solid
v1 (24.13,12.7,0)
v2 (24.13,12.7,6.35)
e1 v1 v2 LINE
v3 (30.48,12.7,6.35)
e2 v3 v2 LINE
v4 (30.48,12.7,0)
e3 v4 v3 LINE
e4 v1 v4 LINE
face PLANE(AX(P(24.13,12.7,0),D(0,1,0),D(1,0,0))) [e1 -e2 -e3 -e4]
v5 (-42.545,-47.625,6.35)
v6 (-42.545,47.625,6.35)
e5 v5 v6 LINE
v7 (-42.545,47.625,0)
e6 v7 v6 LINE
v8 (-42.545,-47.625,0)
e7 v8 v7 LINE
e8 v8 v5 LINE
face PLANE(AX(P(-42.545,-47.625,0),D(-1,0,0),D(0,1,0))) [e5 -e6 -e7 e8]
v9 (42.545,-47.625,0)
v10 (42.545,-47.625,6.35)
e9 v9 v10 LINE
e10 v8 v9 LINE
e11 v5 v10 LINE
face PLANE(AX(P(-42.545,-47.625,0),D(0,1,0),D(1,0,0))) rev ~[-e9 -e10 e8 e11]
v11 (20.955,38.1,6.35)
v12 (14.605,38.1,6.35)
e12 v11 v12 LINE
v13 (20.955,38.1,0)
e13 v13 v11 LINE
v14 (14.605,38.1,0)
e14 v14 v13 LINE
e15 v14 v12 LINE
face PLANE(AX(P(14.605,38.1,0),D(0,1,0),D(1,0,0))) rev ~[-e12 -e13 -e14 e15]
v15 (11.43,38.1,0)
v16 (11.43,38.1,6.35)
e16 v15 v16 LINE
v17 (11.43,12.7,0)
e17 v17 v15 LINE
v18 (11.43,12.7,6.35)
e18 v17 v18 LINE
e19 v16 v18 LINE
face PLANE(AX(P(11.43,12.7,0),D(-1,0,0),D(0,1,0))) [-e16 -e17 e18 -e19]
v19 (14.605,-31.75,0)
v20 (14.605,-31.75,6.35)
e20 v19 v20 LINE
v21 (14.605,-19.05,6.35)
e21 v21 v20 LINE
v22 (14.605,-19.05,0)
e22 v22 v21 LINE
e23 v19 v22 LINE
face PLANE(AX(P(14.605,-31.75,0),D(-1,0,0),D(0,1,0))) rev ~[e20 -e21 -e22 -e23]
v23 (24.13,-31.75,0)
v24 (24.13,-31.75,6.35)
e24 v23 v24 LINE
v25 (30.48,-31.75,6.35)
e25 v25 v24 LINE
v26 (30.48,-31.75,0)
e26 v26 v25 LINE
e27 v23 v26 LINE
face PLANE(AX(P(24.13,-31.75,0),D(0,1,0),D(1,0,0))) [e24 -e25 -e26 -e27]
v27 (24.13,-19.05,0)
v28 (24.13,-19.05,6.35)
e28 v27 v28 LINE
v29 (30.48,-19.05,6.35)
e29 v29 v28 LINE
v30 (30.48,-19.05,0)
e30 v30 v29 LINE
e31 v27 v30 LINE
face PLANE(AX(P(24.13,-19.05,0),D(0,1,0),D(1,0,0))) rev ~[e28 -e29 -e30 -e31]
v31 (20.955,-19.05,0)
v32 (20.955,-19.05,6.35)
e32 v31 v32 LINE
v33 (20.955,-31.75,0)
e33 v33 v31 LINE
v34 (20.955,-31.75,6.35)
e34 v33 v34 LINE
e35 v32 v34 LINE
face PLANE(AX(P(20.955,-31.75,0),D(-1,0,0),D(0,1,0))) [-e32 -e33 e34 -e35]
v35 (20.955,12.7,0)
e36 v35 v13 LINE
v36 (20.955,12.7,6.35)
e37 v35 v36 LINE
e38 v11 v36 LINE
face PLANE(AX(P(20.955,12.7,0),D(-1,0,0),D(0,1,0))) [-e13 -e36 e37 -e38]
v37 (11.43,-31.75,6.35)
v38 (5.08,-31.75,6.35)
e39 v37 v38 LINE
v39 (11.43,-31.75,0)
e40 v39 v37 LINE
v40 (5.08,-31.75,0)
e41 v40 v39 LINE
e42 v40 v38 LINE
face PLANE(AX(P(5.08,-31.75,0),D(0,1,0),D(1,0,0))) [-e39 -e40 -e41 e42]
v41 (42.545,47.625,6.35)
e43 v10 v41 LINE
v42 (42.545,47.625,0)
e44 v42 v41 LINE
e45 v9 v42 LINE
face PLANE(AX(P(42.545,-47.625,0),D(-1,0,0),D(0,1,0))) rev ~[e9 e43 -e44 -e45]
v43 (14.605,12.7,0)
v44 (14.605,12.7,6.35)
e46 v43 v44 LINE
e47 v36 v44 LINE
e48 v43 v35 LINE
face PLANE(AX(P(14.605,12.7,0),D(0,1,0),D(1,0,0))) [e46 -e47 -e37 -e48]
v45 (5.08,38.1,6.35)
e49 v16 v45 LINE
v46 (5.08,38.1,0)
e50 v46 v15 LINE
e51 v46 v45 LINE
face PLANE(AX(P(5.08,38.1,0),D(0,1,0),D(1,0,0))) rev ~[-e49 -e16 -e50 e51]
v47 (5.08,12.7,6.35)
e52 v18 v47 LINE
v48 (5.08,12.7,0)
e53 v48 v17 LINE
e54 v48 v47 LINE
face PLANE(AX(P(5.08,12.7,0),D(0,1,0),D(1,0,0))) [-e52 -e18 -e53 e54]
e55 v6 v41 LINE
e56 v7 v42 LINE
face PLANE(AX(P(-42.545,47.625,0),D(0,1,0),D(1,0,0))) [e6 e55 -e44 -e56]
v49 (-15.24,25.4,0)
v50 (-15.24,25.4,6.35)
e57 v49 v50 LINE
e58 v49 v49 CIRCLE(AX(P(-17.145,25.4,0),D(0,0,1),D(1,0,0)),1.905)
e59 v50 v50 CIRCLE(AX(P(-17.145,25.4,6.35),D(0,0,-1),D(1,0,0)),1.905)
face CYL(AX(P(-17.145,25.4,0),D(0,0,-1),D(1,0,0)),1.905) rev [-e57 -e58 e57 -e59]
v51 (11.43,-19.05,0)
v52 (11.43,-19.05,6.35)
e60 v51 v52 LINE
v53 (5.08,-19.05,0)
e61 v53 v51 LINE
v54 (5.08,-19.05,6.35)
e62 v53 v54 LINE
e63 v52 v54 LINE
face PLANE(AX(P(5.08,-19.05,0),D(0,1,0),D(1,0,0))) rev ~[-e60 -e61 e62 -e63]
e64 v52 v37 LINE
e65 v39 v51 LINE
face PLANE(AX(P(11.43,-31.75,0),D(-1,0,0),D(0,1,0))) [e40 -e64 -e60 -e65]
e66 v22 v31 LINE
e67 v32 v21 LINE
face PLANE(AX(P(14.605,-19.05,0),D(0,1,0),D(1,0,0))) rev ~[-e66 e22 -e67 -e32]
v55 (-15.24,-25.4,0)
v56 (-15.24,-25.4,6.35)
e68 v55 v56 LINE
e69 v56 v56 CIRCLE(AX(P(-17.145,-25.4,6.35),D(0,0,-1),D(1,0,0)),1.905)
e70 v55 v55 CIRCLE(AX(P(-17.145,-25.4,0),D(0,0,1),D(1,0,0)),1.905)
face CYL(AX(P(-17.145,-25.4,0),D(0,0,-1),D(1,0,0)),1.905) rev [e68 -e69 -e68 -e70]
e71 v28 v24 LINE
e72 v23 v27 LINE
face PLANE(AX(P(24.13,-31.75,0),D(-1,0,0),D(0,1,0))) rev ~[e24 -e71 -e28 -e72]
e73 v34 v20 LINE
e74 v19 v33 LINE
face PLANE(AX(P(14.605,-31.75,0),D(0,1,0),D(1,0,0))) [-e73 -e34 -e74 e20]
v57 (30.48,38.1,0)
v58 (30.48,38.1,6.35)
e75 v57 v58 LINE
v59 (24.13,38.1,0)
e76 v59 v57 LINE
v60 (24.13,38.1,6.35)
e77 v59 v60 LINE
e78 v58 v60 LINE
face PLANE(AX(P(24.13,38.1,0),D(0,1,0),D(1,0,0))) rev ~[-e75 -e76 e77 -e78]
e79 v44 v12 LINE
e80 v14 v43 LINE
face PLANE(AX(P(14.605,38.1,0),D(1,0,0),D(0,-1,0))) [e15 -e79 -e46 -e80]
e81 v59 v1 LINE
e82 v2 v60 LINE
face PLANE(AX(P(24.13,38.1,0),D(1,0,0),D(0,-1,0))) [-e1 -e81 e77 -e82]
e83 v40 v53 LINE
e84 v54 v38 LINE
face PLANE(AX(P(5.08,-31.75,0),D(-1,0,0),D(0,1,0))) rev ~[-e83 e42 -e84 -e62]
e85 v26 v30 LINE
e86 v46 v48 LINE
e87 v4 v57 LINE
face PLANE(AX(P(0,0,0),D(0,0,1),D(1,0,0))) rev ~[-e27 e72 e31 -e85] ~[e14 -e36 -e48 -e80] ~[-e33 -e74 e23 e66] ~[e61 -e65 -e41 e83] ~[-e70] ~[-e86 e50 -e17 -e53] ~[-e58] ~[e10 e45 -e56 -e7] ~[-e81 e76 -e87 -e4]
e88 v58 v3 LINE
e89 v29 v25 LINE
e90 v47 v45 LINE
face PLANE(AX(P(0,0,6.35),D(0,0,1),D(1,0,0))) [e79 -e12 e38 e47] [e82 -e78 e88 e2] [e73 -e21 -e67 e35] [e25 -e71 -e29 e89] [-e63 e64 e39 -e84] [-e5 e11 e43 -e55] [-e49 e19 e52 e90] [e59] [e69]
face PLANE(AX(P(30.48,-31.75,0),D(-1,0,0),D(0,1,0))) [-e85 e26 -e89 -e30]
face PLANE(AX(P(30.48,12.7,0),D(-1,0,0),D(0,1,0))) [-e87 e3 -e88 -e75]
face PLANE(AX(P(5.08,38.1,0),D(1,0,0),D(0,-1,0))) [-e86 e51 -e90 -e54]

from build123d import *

# Parameters (mm, degrees)
F0_W     = 85.09
F0_H     = 95.25
F1_DEPTH = 6.35
F2_R     = 1.905
F2_W     = 6.35
F2_H     = 12.7
F2_H_2   = 6.35
F3_DEPTH = 6.351
F4_DEPTH = 132


# Not quite as in the source:
# - an extrude ends at something that could not be found from the text; its depth is read off the source's solid


with BuildPart() as f1:
    # F0 (on Top) → F1 (new body)
    with BuildSketch(Plane.XY):
        Rectangle(F0_W, F0_H)
    extrude(amount=F1_DEPTH)

    # F2 (on Top) → F3 (cut, through all)
    with BuildSketch(Plane.XY):
        with Locations((-17.145, -25.4)):
            Circle(F2_R)
        with Locations((-17.145, 25.4)):
            Circle(F2_R)
        with Locations((8.255, -25.4)):
            Rectangle(F2_W, F2_H)
        with Locations((8.255, 34.925)):
            Rectangle(F2_W, F2_H_2)
        with Locations((8.255, 25.4)):
            Rectangle(F2_W, F2_H)
        with Locations((8.255, 15.875)):
            Rectangle(F2_W, F2_H_2)
        with Locations((27.305, 25.4)):
            Rectangle(F2_W, F2_H)
        with Locations((27.305, 34.925)):
            Rectangle(F2_W, F2_H_2)
        with Locations((27.305, 15.875)):
            Rectangle(F2_W, F2_H_2)
        with Locations((27.305, -25.4)):
            Rectangle(F2_W, F2_H)
        with Locations((17.78, 34.925)):
            Rectangle(F2_W, F2_H_2)
        with Locations((17.78, 25.4)):
            Rectangle(F2_W, F2_H)
        with Locations((17.78, 15.875)):
            Rectangle(F2_W, F2_H_2)
        with Locations((17.78, -25.4)):
            Rectangle(F2_W, F2_H)
    extrude(amount=F3_DEPTH, mode=Mode.SUBTRACT)

    # F2 (on Top) → F4 (cut, through all)
    with BuildSketch(Plane.XY):
        with Locations((-17.145, -25.4)):
            Circle(F2_R)
        with Locations((-17.145, 25.4)):
            Circle(F2_R)
        with Locations((8.255, -25.4)):
            Rectangle(F2_W, F2_H)
        with Locations((8.255, 34.925)):
            Rectangle(F2_W, F2_H_2)
        with Locations((8.255, 25.4)):
            Rectangle(F2_W, F2_H)
        with Locations((8.255, 15.875)):
            Rectangle(F2_W, F2_H_2)
        with Locations((27.305, 25.4)):
            Rectangle(F2_W, F2_H)
        with Locations((27.305, 34.925)):
            Rectangle(F2_W, F2_H_2)
        with Locations((27.305, 15.875)):
            Rectangle(F2_W, F2_H_2)
        with Locations((27.305, -25.4)):
            Rectangle(F2_W, F2_H)
        with Locations((17.78, 34.925)):
            Rectangle(F2_W, F2_H_2)
        with Locations((17.78, 25.4)):
            Rectangle(F2_W, F2_H)
        with Locations((17.78, 15.875)):
            Rectangle(F2_W, F2_H_2)
        with Locations((17.78, -25.4)):
            Rectangle(F2_W, F2_H)
    extrude(amount=-F4_DEPTH, mode=Mode.SUBTRACT)


solid = f1.part
